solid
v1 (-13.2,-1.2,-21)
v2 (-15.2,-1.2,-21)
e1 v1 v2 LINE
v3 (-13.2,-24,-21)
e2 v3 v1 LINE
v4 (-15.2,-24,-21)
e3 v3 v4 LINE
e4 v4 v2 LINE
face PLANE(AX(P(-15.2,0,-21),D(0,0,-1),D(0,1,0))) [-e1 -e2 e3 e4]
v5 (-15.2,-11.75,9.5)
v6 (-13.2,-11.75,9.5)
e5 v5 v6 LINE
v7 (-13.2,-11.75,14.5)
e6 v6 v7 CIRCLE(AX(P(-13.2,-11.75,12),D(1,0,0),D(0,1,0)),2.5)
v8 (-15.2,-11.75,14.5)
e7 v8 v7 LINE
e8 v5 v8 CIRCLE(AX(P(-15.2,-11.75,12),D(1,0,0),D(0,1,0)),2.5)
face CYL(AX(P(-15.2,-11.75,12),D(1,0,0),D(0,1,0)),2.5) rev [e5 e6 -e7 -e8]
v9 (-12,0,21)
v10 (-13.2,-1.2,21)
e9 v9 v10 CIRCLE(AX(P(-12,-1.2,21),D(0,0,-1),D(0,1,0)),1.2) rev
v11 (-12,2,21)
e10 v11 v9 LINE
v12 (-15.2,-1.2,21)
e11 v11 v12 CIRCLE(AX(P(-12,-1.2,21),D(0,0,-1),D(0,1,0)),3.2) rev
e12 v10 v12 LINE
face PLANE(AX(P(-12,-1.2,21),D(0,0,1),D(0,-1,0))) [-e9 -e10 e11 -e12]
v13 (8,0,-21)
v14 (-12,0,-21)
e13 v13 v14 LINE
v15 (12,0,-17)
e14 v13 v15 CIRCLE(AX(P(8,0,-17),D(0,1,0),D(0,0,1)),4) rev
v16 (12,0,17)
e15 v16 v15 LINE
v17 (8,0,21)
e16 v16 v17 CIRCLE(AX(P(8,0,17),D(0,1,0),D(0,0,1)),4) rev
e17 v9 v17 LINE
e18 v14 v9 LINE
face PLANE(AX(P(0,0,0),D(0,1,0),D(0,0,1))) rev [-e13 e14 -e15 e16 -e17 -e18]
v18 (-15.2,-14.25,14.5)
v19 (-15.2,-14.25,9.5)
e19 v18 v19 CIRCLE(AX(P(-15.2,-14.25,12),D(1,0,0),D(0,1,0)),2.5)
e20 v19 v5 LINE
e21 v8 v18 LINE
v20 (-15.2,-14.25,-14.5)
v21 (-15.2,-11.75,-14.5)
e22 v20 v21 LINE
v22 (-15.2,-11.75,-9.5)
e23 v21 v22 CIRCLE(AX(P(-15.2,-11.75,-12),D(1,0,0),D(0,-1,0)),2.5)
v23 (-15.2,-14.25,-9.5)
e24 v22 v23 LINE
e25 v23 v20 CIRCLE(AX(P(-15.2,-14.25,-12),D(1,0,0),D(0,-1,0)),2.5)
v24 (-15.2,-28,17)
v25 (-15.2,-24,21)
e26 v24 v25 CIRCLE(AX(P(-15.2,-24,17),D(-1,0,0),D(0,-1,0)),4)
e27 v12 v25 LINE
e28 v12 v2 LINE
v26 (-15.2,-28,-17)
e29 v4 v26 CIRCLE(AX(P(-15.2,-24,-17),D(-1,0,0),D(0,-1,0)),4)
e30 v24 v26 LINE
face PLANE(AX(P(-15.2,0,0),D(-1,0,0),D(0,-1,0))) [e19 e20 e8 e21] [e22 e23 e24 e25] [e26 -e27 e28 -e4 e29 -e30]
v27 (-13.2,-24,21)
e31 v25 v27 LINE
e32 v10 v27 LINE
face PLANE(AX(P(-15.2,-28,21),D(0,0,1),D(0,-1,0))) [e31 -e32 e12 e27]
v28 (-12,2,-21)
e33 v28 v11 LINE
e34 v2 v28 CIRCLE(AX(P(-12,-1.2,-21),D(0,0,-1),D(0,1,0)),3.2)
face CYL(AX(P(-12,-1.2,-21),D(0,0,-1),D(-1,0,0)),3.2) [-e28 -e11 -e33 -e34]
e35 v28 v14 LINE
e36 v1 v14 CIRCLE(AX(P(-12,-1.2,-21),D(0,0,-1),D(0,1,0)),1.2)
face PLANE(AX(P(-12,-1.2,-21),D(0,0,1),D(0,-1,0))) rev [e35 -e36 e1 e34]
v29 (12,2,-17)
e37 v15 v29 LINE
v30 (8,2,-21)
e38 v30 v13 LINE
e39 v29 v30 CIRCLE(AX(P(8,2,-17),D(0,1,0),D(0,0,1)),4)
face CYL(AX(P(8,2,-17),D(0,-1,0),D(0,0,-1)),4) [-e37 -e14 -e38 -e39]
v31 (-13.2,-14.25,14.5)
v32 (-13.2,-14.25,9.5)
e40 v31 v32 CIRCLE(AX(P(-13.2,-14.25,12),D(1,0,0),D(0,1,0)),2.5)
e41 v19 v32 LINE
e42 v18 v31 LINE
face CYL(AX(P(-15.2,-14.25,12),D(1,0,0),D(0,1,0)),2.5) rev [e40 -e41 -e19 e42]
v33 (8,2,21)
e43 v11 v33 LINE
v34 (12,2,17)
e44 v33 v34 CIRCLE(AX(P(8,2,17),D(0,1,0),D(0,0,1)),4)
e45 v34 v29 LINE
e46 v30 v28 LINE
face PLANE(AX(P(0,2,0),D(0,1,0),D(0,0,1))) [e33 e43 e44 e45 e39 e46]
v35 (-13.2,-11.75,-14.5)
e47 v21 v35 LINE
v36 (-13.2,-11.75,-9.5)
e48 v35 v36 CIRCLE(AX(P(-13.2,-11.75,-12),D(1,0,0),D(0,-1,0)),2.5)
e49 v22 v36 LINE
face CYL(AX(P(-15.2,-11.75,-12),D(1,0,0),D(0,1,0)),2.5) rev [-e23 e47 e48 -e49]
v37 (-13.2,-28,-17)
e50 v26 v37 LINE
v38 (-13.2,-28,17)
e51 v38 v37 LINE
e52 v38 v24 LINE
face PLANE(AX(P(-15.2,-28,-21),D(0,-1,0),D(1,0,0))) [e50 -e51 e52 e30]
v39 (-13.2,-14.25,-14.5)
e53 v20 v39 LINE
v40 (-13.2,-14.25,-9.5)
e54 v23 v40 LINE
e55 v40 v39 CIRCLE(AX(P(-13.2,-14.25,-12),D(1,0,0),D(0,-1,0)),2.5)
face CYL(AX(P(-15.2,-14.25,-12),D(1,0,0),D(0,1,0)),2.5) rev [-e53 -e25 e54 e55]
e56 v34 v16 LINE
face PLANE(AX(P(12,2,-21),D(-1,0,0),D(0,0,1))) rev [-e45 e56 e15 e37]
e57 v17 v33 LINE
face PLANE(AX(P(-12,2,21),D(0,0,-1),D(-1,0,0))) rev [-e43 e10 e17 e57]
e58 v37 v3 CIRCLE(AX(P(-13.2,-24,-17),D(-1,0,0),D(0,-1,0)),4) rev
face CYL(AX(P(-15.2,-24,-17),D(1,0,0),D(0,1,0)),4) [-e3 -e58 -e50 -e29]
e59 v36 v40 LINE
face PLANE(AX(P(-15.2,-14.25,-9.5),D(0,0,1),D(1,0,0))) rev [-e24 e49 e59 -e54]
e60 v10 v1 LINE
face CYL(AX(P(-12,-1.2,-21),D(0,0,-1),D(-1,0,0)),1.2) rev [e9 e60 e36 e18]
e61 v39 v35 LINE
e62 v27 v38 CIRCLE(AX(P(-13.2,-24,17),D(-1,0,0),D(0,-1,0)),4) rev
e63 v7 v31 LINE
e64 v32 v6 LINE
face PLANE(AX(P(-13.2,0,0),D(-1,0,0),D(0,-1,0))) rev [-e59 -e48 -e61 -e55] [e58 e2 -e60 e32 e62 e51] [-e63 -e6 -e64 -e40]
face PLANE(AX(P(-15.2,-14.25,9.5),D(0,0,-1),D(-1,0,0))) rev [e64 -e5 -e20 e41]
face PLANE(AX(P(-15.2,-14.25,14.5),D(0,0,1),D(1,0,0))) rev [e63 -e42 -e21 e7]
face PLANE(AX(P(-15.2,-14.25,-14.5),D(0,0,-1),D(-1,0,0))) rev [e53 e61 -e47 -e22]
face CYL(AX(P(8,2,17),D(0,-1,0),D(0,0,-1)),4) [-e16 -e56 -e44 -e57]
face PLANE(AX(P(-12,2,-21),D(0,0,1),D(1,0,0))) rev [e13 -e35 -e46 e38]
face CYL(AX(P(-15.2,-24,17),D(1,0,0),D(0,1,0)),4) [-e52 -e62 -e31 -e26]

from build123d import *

# Parameters (mm, degrees)
SKETCH1_W          = 24
SKETCH1_H          = 42
BASE_FLANGE1_DEPTH = 2
EDGE_FLANGE1_DEPTH = 42
FILLET1_R          = 4
CUT_EXTRUDE1_DEPTH = 2


# Sheet-metal steps are written as plain solids
with BuildPart() as part:
    # Sketch1 → Base-Flange1 (new body)
    with BuildSketch(Plane(origin=(0, 0, 0), x_dir=(1, 0, 0), z_dir=(0, 1, 0))):
        Rectangle(SKETCH1_W, SKETCH1_H)
    extrude(amount=BASE_FLANGE1_DEPTH)

    # Edge-Flange1 section (across the edge) → Edge-Flange1 (add)
    with BuildSketch(Plane(origin=(-13.2, 0, 21), x_dir=(1, 0, 0), z_dir=(0, 0, -1))):
        with BuildLine():
            Line((-2, 1.2), (-2, 28))
            Line((-2, 28), (0, 28))
            Line((0, 28), (0, 1.2))
            ThreePointArc((0, 1.2), (0.351471863, 0.351471863), (1.2, 0))
            Line((1.2, 0), (1.2, -2))
            ThreePointArc((1.2, -2), (-1.0627417, -1.0627417), (-2, 1.2))
        make_face()
    extrude(amount=EDGE_FLANGE1_DEPTH)

    # Fillet1
    fillet1_edges = [part.edges().sort_by_distance(p)[0] for p in [
        (-14.2, -28, 21),
        (-14.2, -28, -21),
        (12, 1, 21),
        (12, 1, -21),
    ]]
    fillet(fillet1_edges, radius=FILLET1_R)

    # Sketch11 → Cut-Extrude1 (cut)
    with BuildSketch(Plane(origin=(-13.2, 0, 0), x_dir=(0, 0, -1), z_dir=(1, 0, 0))):
        with BuildLine():
            Line((9.5, -14.25), (9.5, -11.75))
            ThreePointArc((9.5, -11.75), (12, -9.25), (14.5, -11.75))
            Line((14.5, -11.75), (14.5, -14.25))
            ThreePointArc((14.5, -14.25), (12, -16.75), (9.5, -14.25))
        make_face()
        with BuildLine():
            Line((-9.5, -14.25), (-9.5, -11.75))
            ThreePointArc((-9.5, -11.75), (-12, -9.25), (-14.5, -11.75))
            Line((-14.5, -11.75), (-14.5, -14.25))
            ThreePointArc((-14.5, -14.25), (-12, -16.75), (-9.5, -14.25))
        make_face()
    extrude(amount=-CUT_EXTRUDE1_DEPTH, mode=Mode.SUBTRACT)


solid = part.part
